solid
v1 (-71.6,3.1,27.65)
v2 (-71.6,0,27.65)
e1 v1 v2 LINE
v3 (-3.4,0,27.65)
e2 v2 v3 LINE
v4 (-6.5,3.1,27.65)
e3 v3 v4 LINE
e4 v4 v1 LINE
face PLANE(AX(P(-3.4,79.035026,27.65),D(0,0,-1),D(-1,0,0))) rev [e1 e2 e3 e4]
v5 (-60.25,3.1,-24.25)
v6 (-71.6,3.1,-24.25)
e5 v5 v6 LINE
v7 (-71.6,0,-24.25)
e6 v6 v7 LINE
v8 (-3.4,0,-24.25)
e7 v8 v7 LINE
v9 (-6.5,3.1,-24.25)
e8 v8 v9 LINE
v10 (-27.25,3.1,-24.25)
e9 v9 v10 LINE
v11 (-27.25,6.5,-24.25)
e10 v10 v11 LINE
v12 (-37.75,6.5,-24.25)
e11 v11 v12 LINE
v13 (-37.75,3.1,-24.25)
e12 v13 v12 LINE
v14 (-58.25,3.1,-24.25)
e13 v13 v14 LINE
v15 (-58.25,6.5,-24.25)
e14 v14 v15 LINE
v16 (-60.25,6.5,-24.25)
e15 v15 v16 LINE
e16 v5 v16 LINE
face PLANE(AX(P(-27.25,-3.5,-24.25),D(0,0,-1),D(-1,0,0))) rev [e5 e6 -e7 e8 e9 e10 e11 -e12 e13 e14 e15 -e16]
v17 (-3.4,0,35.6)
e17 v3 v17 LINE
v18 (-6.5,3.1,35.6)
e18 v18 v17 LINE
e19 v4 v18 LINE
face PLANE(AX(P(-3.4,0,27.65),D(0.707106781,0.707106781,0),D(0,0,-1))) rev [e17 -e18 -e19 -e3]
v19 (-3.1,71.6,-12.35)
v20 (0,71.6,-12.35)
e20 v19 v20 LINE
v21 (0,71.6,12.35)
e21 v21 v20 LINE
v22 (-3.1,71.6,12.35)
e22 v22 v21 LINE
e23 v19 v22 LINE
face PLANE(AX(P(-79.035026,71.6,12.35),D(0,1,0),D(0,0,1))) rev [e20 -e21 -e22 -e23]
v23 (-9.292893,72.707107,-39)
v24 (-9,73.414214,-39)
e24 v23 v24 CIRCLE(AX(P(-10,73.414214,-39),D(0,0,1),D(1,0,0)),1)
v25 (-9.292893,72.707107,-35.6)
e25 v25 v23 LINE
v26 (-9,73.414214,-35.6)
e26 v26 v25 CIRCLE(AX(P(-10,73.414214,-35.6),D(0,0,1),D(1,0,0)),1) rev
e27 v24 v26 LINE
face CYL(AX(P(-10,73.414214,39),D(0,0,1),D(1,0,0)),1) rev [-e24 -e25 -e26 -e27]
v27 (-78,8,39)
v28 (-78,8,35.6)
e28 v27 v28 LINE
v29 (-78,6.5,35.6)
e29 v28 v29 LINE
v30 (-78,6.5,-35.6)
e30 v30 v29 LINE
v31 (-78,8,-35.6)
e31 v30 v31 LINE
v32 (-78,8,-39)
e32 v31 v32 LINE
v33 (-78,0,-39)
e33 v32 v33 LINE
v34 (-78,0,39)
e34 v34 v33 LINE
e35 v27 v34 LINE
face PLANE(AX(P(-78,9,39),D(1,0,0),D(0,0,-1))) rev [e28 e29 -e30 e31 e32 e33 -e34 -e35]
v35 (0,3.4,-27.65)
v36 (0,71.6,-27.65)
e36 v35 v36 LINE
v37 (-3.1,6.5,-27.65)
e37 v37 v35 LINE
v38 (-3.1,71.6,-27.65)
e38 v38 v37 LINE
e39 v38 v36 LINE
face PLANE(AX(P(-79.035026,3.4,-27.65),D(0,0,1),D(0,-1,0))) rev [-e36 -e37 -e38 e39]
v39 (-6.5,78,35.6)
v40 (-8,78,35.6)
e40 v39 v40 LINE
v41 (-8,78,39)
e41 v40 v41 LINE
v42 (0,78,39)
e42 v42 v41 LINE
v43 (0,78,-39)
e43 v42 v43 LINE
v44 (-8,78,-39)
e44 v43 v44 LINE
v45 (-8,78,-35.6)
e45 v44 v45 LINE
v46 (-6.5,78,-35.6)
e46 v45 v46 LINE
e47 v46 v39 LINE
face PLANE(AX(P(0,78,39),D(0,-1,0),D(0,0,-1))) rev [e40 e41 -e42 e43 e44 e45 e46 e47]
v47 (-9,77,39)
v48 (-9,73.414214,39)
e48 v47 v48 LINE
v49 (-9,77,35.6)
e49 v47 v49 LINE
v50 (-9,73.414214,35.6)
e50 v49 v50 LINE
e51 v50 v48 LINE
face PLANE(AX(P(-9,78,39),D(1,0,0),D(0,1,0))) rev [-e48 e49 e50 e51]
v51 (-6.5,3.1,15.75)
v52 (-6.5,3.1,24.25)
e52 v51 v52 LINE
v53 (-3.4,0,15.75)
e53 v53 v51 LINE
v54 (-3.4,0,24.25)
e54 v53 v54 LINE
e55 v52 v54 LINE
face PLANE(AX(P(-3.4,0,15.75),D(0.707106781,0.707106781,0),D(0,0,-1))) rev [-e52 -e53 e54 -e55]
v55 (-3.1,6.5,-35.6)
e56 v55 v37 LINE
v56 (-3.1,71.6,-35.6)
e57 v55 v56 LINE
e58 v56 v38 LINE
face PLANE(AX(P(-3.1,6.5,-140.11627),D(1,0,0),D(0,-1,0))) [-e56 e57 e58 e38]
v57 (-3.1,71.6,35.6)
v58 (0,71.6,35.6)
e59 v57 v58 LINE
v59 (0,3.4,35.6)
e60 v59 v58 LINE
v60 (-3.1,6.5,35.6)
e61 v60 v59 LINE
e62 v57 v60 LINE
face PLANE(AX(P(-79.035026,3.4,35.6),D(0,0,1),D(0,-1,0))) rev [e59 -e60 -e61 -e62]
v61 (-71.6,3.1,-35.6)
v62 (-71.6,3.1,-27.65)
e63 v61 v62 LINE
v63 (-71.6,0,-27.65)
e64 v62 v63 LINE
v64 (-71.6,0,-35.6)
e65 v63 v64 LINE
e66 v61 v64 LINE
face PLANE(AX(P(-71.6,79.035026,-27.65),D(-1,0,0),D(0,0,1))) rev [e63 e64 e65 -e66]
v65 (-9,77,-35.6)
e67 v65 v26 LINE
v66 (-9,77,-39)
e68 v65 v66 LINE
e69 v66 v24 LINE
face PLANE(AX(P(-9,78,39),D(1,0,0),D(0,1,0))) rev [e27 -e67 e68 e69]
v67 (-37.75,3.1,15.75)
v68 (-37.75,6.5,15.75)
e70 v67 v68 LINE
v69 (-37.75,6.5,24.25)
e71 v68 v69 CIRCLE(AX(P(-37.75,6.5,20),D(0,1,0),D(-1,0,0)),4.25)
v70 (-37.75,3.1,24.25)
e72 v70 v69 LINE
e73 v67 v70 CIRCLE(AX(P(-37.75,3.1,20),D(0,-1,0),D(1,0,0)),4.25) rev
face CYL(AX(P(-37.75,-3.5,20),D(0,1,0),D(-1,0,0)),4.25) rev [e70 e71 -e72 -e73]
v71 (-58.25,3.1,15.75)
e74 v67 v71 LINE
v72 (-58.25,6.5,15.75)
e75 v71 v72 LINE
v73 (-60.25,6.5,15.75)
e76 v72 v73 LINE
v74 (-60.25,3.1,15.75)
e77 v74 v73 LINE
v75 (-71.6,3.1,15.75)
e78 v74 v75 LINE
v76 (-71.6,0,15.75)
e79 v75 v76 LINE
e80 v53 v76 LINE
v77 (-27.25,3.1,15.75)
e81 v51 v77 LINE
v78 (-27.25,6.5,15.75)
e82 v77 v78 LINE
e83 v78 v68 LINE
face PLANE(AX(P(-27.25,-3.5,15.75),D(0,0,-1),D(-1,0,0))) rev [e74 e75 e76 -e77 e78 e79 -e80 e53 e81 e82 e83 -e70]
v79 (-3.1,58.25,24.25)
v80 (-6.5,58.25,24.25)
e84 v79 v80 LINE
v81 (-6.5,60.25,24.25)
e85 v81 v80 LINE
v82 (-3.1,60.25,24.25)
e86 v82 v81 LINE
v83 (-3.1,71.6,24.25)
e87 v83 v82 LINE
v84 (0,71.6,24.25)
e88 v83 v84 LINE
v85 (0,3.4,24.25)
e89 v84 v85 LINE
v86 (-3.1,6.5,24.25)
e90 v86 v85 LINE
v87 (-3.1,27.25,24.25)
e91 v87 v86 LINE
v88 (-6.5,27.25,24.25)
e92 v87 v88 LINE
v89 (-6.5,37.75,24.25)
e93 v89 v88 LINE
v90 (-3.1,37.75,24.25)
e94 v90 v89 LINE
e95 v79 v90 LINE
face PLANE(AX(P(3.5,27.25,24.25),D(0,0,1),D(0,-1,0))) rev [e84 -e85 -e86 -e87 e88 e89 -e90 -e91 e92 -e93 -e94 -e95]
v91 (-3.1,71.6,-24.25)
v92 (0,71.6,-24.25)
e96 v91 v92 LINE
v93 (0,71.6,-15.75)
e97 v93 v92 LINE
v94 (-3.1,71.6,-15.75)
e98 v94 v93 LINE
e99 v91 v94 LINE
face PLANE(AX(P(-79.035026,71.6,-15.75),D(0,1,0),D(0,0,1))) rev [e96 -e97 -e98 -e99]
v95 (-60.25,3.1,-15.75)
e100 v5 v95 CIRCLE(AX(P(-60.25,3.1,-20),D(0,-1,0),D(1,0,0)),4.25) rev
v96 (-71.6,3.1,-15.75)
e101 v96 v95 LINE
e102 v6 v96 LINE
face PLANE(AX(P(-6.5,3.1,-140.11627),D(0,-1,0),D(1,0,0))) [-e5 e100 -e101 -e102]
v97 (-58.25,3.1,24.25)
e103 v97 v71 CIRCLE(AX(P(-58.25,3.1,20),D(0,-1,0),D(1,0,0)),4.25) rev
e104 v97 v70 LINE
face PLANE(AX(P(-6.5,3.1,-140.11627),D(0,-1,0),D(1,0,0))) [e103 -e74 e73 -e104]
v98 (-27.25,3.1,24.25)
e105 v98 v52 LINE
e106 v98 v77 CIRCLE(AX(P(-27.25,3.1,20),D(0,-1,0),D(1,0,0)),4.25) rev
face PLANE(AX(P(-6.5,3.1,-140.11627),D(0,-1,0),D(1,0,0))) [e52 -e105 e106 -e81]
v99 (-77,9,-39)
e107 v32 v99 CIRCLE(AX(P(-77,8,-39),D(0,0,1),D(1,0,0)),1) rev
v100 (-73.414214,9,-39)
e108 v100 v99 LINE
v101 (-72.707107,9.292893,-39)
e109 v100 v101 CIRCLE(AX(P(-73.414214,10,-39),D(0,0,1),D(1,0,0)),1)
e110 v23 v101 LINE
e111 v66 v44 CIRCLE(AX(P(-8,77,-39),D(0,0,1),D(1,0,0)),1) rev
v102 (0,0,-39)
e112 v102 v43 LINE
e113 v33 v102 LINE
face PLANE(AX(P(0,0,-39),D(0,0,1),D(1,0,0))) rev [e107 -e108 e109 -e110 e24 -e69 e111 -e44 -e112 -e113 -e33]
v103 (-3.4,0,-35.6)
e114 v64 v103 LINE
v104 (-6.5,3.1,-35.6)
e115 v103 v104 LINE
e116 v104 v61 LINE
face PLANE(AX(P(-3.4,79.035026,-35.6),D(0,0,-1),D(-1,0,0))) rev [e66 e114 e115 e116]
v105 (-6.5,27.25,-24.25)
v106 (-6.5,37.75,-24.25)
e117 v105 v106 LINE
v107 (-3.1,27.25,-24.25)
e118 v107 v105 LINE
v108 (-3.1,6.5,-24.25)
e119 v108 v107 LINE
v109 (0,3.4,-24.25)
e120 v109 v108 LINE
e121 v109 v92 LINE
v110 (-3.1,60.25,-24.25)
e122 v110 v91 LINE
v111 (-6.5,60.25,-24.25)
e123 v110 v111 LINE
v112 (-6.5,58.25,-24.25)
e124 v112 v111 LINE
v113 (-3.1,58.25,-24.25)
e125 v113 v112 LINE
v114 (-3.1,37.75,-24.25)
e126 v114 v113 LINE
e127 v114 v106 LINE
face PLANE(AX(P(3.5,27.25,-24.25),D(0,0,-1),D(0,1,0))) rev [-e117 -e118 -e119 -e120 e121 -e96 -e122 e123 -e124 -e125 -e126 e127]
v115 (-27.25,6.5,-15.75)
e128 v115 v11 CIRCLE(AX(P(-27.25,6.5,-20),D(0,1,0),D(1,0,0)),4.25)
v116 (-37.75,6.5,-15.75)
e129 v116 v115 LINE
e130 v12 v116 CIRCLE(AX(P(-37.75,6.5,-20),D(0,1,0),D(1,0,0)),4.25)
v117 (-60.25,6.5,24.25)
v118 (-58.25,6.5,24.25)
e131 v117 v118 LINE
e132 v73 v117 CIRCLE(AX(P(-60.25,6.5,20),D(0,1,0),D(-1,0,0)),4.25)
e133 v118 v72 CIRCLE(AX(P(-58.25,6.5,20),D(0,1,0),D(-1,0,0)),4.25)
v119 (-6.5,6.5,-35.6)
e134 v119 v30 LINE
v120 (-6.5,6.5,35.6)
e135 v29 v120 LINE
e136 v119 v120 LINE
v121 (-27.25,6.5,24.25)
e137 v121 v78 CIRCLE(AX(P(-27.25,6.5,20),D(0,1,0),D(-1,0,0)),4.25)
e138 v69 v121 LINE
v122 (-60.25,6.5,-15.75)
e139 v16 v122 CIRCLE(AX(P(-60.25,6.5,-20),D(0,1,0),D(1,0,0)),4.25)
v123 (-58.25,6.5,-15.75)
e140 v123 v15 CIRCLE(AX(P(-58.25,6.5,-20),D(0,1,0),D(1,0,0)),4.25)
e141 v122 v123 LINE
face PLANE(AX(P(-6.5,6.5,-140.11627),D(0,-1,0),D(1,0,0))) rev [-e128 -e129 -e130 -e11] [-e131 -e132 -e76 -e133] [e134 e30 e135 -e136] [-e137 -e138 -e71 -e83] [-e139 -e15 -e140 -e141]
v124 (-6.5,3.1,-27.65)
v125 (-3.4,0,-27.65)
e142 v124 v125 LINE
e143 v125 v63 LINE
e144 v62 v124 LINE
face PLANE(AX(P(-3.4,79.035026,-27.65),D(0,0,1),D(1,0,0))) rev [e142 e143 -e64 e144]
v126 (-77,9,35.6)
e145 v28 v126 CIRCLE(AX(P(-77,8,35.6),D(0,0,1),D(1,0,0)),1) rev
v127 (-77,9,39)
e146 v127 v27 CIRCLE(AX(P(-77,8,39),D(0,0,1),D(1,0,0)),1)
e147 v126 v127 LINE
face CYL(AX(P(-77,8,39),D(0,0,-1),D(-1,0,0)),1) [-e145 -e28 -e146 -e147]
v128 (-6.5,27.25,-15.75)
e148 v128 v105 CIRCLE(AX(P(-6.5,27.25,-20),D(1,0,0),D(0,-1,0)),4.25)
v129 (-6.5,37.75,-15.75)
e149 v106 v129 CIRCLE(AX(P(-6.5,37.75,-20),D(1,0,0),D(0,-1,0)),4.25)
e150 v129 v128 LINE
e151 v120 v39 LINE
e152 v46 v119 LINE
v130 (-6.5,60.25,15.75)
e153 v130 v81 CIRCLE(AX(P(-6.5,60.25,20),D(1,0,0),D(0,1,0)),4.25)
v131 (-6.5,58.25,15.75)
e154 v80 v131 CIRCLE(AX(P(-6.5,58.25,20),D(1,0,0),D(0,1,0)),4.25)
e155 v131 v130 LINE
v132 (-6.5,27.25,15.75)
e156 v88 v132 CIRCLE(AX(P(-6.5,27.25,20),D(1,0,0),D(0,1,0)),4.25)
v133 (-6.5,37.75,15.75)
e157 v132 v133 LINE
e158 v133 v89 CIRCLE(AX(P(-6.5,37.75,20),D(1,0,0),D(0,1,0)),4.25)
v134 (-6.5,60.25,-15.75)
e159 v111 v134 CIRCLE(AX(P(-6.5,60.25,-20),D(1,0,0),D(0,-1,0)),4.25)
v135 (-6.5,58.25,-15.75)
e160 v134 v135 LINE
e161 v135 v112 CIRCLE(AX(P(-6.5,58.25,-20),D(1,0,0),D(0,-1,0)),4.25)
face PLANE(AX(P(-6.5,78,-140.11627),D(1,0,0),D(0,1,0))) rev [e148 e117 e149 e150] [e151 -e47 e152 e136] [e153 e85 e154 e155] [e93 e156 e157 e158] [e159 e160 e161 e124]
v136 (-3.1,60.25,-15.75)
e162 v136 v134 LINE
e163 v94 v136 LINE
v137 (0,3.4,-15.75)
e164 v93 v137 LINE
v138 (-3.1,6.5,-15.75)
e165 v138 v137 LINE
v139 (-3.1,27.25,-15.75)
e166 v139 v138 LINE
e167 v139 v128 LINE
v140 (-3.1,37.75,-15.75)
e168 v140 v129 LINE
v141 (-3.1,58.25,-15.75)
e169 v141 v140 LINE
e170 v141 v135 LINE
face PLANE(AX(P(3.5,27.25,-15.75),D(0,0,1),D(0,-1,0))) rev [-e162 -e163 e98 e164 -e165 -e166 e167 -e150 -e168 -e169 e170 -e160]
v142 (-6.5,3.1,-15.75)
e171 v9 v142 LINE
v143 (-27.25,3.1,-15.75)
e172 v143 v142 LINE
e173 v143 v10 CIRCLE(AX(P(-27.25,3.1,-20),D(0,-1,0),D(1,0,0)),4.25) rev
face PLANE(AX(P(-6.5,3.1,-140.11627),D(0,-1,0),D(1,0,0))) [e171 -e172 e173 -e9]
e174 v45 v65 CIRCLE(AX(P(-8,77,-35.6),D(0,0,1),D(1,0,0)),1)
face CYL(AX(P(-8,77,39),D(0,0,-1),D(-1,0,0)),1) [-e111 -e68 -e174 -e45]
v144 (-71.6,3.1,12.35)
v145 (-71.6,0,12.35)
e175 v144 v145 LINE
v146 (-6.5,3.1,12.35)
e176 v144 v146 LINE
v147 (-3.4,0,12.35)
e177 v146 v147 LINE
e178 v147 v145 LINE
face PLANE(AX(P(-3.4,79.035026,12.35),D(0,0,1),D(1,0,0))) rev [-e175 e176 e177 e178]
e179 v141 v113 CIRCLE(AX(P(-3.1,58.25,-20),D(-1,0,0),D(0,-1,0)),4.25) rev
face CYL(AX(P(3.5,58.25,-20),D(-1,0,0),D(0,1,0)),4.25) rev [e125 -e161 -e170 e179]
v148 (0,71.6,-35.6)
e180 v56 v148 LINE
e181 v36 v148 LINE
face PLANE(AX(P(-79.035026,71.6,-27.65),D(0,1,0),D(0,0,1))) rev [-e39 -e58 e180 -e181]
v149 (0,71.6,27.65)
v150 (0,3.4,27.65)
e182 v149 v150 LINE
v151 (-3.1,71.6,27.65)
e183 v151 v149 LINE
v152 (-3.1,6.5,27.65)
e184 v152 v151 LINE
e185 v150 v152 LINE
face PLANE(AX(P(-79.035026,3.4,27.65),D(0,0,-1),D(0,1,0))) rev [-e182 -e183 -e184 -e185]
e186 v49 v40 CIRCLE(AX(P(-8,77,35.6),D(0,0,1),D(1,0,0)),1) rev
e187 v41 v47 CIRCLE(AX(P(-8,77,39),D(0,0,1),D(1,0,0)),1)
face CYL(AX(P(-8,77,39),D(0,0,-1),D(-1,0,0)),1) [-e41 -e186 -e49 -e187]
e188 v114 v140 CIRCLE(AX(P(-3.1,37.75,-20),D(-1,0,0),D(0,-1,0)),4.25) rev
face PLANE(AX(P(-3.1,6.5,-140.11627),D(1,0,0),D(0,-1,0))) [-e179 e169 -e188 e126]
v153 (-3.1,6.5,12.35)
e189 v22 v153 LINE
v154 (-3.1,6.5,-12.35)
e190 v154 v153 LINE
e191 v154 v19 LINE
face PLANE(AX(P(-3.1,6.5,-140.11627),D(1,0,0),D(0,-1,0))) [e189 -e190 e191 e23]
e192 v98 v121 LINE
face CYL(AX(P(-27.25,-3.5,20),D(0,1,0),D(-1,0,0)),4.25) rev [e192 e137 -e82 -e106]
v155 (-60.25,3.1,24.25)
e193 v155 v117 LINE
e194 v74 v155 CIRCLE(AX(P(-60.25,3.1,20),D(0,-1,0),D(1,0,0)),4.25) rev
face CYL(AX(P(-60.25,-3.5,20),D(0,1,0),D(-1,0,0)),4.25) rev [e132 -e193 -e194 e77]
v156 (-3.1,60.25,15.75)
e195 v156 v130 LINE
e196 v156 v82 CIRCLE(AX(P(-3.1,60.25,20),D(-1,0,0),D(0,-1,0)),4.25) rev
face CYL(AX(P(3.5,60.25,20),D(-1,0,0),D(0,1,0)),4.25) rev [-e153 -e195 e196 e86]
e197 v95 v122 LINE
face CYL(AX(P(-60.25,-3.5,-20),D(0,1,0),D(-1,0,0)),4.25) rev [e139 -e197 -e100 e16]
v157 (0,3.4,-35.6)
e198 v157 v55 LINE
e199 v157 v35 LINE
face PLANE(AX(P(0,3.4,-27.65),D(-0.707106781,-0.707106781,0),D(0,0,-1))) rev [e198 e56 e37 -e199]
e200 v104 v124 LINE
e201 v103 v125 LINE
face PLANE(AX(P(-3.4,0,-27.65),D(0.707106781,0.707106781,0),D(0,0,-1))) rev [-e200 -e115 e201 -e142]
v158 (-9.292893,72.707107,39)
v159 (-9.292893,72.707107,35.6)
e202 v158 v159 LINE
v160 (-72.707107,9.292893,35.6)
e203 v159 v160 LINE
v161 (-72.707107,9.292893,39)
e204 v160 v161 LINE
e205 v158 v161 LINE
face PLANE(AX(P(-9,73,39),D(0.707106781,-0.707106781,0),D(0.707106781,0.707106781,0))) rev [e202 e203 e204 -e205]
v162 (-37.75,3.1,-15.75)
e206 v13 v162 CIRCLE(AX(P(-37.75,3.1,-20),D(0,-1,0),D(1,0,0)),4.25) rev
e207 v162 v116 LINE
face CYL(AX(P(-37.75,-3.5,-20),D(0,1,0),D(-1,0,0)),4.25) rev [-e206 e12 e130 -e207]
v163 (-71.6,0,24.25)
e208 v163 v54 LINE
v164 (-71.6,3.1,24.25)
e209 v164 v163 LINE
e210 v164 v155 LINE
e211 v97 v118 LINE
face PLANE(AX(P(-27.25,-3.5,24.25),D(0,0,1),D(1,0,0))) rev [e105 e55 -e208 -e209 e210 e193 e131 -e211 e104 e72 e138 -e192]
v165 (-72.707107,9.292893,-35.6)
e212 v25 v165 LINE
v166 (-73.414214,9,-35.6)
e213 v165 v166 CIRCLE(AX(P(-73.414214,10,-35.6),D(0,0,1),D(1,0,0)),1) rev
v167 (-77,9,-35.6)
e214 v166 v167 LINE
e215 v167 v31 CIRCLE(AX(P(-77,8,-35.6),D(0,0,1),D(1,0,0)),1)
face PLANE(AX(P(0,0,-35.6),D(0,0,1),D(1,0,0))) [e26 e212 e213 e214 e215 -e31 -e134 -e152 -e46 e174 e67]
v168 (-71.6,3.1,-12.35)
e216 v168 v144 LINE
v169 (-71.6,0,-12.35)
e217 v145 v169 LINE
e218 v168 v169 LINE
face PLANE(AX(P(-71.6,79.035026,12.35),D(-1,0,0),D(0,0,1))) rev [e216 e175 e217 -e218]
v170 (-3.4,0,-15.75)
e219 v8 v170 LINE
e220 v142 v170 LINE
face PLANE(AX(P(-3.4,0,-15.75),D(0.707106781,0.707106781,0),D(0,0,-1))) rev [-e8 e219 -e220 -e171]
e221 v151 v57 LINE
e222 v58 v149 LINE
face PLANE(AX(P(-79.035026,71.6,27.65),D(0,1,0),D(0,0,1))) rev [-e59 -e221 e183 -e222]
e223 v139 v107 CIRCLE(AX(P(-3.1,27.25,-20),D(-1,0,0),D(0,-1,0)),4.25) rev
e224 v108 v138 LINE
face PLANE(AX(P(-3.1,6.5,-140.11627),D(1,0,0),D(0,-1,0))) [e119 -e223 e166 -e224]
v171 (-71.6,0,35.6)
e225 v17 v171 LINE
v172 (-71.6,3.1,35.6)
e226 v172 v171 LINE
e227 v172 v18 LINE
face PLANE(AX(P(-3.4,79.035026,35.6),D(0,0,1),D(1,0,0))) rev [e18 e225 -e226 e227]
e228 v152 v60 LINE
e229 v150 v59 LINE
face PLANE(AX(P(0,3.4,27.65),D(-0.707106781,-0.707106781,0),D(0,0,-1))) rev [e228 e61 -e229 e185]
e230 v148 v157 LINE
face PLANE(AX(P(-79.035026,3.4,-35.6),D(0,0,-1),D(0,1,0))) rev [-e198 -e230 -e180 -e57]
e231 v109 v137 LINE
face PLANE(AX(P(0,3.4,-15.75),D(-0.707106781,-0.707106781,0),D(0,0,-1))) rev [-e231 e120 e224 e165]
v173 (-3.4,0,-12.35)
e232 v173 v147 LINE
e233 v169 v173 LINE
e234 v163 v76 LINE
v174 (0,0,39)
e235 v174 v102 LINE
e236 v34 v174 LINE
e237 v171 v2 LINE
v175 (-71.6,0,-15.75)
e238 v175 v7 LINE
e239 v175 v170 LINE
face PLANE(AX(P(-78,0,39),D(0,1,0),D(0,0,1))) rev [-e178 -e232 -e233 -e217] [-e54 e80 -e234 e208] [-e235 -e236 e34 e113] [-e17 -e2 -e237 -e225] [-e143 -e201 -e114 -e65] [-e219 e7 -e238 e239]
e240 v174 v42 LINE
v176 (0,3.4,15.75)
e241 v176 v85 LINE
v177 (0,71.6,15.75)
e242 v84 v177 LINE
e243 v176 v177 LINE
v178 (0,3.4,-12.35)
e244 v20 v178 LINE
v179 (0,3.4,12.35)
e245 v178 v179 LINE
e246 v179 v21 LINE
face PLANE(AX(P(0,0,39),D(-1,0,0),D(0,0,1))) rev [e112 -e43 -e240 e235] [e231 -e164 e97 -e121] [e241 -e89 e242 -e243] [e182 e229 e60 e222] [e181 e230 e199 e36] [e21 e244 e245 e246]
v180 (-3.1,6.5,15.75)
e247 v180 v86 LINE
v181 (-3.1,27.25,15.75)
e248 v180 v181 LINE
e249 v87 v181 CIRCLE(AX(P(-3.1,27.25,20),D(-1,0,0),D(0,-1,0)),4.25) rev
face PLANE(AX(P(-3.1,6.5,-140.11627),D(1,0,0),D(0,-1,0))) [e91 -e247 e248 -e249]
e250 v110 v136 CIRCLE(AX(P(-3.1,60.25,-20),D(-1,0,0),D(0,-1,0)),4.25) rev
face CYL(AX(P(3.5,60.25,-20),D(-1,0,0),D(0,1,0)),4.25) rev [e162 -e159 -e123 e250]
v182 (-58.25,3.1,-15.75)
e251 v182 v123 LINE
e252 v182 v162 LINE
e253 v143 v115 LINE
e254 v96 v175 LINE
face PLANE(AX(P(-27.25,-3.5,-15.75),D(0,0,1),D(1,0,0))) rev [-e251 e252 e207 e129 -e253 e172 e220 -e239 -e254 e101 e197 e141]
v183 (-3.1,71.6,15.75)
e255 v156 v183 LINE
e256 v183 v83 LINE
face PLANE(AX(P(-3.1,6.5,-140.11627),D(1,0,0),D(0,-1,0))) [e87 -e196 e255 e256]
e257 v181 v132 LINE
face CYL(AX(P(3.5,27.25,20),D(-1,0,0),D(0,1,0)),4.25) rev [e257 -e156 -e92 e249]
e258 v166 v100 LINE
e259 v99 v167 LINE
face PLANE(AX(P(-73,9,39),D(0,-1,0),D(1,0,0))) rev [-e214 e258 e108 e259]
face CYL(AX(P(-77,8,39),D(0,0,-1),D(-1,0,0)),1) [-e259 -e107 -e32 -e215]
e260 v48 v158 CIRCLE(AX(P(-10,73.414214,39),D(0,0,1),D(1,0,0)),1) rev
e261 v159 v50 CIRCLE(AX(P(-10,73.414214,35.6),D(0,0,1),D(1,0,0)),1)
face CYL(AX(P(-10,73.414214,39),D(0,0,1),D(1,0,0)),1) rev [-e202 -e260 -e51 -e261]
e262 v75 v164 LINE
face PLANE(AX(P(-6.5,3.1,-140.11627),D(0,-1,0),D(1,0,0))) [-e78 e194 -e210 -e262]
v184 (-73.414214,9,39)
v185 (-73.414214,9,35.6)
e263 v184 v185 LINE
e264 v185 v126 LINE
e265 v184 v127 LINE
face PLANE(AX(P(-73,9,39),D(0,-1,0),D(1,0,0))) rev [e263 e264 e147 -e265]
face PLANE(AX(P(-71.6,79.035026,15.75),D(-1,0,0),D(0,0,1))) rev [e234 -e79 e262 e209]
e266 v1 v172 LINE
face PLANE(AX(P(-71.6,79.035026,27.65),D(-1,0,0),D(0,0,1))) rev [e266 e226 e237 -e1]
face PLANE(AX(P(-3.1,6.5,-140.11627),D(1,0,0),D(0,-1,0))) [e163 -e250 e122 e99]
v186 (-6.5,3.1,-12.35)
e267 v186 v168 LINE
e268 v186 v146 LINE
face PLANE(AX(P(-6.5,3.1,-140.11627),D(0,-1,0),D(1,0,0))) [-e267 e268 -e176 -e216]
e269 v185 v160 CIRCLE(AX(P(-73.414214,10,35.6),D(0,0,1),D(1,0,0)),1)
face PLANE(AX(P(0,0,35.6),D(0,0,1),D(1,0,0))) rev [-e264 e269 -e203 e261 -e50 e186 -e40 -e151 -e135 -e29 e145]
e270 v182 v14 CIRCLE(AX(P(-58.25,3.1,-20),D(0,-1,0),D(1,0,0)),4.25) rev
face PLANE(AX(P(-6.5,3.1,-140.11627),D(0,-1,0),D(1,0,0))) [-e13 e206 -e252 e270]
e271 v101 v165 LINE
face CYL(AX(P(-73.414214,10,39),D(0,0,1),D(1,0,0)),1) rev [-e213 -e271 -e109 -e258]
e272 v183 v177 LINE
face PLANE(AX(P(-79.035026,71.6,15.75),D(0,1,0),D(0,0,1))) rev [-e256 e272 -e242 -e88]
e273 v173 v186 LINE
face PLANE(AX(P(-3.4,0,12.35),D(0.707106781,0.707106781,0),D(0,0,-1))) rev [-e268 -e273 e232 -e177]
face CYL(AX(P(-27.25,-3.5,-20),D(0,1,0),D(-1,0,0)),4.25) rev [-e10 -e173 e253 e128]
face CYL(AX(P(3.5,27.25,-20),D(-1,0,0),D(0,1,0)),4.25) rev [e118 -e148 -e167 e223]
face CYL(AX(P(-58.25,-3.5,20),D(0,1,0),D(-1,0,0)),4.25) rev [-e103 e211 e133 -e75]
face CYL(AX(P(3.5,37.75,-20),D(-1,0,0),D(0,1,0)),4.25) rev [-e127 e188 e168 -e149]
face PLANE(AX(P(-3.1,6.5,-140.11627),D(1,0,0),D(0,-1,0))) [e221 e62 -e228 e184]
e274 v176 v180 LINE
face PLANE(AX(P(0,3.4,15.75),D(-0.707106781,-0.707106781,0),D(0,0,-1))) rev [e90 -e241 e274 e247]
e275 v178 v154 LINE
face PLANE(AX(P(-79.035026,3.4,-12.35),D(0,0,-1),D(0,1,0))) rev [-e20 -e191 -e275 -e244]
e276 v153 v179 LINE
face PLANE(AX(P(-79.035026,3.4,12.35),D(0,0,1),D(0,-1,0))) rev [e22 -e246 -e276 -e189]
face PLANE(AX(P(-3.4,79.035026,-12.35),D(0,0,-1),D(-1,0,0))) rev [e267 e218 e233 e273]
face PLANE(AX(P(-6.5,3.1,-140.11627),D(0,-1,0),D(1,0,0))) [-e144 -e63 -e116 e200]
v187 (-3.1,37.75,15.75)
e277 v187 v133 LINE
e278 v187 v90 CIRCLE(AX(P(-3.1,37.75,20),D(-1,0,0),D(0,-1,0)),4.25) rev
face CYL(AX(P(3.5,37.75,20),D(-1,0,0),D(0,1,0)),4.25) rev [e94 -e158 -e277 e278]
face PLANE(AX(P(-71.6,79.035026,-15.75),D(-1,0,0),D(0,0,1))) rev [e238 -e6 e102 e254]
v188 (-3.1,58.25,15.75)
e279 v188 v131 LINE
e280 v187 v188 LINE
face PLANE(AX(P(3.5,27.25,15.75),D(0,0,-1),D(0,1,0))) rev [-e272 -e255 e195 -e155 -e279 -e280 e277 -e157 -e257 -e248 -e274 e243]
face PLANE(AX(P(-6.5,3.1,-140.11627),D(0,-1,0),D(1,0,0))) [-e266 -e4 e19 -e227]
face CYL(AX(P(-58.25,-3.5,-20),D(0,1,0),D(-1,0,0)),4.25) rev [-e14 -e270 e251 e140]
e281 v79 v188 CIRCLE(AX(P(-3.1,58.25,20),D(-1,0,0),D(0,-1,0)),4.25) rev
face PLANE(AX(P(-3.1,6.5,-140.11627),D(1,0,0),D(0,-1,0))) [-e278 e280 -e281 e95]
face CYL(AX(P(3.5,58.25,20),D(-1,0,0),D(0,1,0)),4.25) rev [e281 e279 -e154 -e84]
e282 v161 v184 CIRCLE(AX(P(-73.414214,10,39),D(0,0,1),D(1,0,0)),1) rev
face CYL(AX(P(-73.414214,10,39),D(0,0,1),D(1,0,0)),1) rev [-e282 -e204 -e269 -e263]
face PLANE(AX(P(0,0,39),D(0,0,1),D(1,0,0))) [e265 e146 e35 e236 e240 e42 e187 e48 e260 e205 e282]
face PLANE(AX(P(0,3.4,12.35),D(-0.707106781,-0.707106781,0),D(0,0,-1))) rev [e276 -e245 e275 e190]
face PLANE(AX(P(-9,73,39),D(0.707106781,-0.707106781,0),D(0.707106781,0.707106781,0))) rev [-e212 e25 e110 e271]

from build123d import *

# Parameters (mm, degrees)
BOSS_EXTRUDE1_DEPTH      = 39
CUT_EXTRUDE1_DEPTH       = 35.6
CUT_EXTRUDE1_DEPTH_BACK  = 35.6
SKETCH2_W                = 71.5
SKETCH2_H                = 71.5
CUT_EXTRUDE2_DEPTH       = 10
SKETCH5_W                = 68.2
SKETCH5_H                = 8.5
SKETCH5_H_2              = 7.95
SKETCH5_H_3              = 24.7
CUT_EXTRUDE3_DEPTH       = 3.1
CHAMFER1_SIZE            = 3.1
CHAMFER1_OF_MIRROR1_SIZE = 3.1
FILLET1_R                = 1


with BuildPart() as part:
    # Sketch1 → Boss-Extrude1 (new, symmetric)
    with BuildSketch(Plane.XY):
        Polygon((-78, 0), (0, 0), (0, 78), (-9, 78), (-9, 73), (-73, 9), (-78, 9), align=None)
    extrude(amount=BOSS_EXTRUDE1_DEPTH, both=True)

    # Sketch2 → Cut-Extrude1 (cut, two sides: drawn at the far end of the back side and taken through both)
    with BuildSketch(Plane.XY.offset(-CUT_EXTRUDE1_DEPTH_BACK)):
        with Locations((-42.25, 42.25)):
            Rectangle(SKETCH2_W, SKETCH2_H)
    extrude(amount=CUT_EXTRUDE1_DEPTH + CUT_EXTRUDE1_DEPTH_BACK, mode=Mode.SUBTRACT)

    # Sketch3 → Cut-Extrude2 (cut)
    with BuildSketch(Plane(origin=(0, 6.5, 0), x_dir=(1, 0, 0), z_dir=(0, 1, 0))):
        with BuildLine():
            Line((-27.25, -24.25), (-37.75, -24.25))
            ThreePointArc((-37.75, -24.25), (-42, -20), (-37.75, -15.75))
            Line((-37.75, -15.75), (-27.25, -15.75))
            ThreePointArc((-27.25, -15.75), (-23, -20), (-27.25, -24.25))
        make_face()
        with BuildLine():
            Line((-60.25, -15.75), (-58.25, -15.75))
            ThreePointArc((-58.25, -15.75), (-54, -20), (-58.25, -24.25))
            Line((-58.25, -24.25), (-60.25, -24.25))
            ThreePointArc((-60.25, -24.25), (-64.5, -20), (-60.25, -15.75))
        make_face()
        with BuildLine():
            Line((-27.25, 24.25), (-37.75, 24.25))
            ThreePointArc((-37.75, 24.25), (-42, 20), (-37.75, 15.75))
            Line((-37.75, 15.75), (-27.25, 15.75))
            ThreePointArc((-27.25, 15.75), (-23, 20), (-27.25, 24.25))
        make_face()
        with BuildLine():
            Line((-60.25, 15.75), (-58.25, 15.75))
            ThreePointArc((-58.25, 15.75), (-54, 20), (-58.25, 24.25))
            Line((-58.25, 24.25), (-60.25, 24.25))
            ThreePointArc((-60.25, 24.25), (-64.5, 20), (-60.25, 15.75))
        make_face()
    cut_extrude2 = extrude(amount=-CUT_EXTRUDE2_DEPTH, mode=Mode.SUBTRACT)

    # Sketch5 → Cut-Extrude3 (cut)
    with BuildSketch(Plane.XZ):
        with Locations((-37.5, 20)):
            Rectangle(SKETCH5_W, SKETCH5_H)
        with Locations((-37.5, 31.625)):
            Rectangle(SKETCH5_W, SKETCH5_H_2)
        with Locations((-37.5, 0)):
            Rectangle(SKETCH5_W, SKETCH5_H_3)
        with Locations((-37.5, -31.625)):
            Rectangle(SKETCH5_W, SKETCH5_H_2)
        with Locations((-37.5, -20)):
            Rectangle(SKETCH5_W, SKETCH5_H)
    cut_extrude3 = extrude(amount=-CUT_EXTRUDE3_DEPTH, mode=Mode.SUBTRACT)

    # Chamfer1
    chamfer1_edges = [part.edges().sort_by_distance(p)[0] for p in [
        (-3.4, 3.1, 31.625),
        (-3.4, 3.1, 20),
        (-3.4, 3.1, 0),
        (-3.4, 3.1, -20),
        (-3.4, 3.1, -31.625),
    ]]
    chamfer(chamfer1_edges, length=CHAMFER1_SIZE - 0.0001)  # a hair under: the kernel refuses the full size

    # Mirror1: Cut-Extrude2, Cut-Extrude3 across plane
    add(cut_extrude2.mirror(Plane(origin=(0, 0, 0), x_dir=(0, 0, 1), z_dir=(-0.7071067811865474, -0.7071067811865477, 0))), mode=Mode.SUBTRACT)
    add(cut_extrude3.mirror(Plane(origin=(0, 0, 0), x_dir=(0, 0, 1), z_dir=(-0.7071067811865474, -0.7071067811865477, 0))), mode=Mode.SUBTRACT)

    # Chamfer1 of Mirror1
    chamfer1_of_mirror1_edges = [part.edges().sort_by_distance(p)[0] for p in [
        (-3.1, 3.4, 31.625),
        (-3.1, 3.4, 20),
        (-3.1, 3.4, 0),
        (-3.1, 3.4, -20),
        (-3.1, 3.4, -31.625),
    ]]
    chamfer(chamfer1_of_mirror1_edges, length=CHAMFER1_OF_MIRROR1_SIZE - 0.0001)  # a hair under: the kernel refuses the full size

    # Fillet1
    fillet1_edges = [part.edges().sort_by_distance(p)[0] for p in [
        (-78, 9, 37.3),
        (-73, 9, 37.3),
        (-9, 73, 37.3),
        (-9, 78, 37.3),
        (-78, 9, -37.3),
        (-73, 9, -37.3),
        (-9, 73, -37.3),
        (-9, 78, -37.3),
    ]]
    fillet(fillet1_edges, radius=FILLET1_R)


solid = part.part
